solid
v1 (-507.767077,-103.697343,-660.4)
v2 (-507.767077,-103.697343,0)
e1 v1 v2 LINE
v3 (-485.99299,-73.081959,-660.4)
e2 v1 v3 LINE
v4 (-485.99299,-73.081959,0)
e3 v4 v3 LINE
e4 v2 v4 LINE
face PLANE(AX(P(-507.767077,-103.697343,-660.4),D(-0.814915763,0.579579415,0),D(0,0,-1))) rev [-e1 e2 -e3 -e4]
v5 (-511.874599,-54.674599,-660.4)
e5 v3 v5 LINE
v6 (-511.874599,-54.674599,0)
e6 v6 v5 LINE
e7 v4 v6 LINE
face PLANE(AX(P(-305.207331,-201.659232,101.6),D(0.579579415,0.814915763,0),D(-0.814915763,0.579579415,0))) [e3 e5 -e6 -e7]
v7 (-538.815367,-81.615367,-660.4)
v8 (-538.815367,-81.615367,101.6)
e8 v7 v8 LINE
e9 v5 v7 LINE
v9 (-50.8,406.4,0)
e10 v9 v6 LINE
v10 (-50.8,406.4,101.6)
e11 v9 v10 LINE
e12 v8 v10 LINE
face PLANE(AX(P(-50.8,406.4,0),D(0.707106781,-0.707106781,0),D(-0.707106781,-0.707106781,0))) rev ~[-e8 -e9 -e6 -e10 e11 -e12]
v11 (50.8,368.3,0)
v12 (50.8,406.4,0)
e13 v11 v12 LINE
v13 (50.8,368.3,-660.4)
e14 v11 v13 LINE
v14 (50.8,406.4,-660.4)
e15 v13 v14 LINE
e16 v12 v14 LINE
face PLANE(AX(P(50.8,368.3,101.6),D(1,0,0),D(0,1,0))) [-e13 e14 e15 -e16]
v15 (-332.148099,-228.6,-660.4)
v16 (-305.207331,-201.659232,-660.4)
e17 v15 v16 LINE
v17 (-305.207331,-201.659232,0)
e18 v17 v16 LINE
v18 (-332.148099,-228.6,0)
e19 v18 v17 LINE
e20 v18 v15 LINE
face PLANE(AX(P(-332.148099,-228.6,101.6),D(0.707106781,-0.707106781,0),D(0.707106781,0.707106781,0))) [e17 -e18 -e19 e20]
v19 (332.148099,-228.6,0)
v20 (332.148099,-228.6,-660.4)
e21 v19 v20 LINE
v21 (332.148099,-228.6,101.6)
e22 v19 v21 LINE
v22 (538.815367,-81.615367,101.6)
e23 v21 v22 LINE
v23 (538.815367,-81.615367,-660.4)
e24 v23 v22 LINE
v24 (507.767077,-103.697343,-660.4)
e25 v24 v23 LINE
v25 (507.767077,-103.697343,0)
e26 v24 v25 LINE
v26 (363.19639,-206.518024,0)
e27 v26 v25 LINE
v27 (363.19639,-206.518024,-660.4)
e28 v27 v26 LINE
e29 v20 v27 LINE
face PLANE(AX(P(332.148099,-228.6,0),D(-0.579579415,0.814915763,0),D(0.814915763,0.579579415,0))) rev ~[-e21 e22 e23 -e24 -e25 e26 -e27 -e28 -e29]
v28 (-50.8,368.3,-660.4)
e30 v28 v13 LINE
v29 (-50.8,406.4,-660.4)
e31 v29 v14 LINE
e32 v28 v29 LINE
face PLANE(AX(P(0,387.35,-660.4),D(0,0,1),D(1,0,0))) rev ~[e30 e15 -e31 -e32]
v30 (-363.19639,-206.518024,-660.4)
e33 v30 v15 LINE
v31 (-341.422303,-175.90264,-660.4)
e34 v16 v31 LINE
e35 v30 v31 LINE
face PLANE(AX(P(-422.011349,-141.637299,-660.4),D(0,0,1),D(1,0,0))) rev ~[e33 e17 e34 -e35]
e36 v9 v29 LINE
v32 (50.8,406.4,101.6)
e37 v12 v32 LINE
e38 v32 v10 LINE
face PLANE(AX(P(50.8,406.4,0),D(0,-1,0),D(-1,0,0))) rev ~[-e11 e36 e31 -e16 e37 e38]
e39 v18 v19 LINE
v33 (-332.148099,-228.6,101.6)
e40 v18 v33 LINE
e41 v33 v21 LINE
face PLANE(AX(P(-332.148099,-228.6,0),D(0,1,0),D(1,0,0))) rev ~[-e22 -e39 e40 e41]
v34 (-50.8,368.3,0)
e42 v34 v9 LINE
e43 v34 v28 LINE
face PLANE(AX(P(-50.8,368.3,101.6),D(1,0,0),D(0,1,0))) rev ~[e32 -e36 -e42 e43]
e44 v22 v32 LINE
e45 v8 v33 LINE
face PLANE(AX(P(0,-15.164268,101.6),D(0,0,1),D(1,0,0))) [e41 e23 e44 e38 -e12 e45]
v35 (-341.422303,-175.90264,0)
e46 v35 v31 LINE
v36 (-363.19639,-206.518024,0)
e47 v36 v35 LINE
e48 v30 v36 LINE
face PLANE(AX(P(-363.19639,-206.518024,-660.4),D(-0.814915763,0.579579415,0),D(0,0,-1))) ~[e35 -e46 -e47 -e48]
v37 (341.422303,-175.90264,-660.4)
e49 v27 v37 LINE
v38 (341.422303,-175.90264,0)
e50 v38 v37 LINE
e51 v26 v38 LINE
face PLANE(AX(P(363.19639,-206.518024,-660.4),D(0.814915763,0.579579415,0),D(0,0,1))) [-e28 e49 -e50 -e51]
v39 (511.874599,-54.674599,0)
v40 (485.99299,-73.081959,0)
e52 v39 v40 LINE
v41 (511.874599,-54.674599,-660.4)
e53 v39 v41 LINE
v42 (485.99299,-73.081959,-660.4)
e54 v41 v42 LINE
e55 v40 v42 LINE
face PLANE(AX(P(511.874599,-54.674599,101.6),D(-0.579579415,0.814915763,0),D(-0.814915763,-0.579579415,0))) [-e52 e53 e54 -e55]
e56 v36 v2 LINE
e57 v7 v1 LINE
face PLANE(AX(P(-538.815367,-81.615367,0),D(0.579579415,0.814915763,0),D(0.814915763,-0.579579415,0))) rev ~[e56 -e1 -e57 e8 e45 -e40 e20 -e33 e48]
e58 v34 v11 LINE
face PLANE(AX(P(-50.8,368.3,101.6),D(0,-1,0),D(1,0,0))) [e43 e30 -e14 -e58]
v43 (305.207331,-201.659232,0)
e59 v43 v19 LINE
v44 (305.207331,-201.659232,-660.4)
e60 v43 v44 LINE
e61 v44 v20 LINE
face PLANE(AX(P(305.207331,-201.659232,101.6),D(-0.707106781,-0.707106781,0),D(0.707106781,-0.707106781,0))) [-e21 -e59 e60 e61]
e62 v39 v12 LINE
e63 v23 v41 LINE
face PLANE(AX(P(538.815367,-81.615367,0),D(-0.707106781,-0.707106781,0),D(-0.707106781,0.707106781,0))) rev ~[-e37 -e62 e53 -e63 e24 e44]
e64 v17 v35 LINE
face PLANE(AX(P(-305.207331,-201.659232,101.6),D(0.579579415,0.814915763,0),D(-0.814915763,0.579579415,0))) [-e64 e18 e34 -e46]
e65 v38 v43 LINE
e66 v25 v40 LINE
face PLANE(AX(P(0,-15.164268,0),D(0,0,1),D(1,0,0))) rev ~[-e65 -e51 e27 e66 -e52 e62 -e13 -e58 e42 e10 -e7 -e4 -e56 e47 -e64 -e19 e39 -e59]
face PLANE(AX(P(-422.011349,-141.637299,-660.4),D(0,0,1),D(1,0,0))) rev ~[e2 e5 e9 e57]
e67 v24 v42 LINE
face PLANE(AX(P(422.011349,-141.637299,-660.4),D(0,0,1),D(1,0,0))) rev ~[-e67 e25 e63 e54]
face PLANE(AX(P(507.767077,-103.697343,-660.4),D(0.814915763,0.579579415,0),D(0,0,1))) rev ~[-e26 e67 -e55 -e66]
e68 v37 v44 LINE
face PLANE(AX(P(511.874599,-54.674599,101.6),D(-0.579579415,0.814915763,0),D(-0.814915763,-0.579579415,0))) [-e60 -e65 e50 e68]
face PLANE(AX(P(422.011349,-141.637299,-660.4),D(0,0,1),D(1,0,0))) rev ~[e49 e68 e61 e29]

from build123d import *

# Parameters (mm, degrees)
F1_DEPTH = 101.6
F2_W     = 101.6
F2_H     = 38.1
F3_DEPTH = 762
F4_W     = 177.4056817709
F4_H     = 660.4
F5_DEPTH = 76.2


# Not quite as in the source:
# - a pattern or mirror of a feature is missing from the dataset's text; its kind, count and spacing are read off the source's solid


with BuildPart() as f1:
    # F0 (on Top) → F1 (new body)
    with BuildSketch(Plane.XY):
        Polygon((332.1480994978, 125.0519005022), (228.6, 228.6), (0, 228.6), (-228.6, 228.6), (-332.1480994978, 125.0519005022), (-332.1480994978, -228.6), (-228.6, -228.6), (228.6, -228.6), (332.1480994978, -228.6), align=None)
        Polygon((-228.6, 228.6), (0, 228.6), (0, 406.4), (-50.8, 406.4), align=None)
        Polygon((0, 228.6), (228.6, 228.6), (50.8, 406.4), (0, 406.4), align=None)
        Polygon((538.8153672641, -81.6153672641), (332.1480994978, 125.0519005022), (332.1480994978, -228.6), align=None)
        Polygon((-332.1480994978, -228.6), (-332.1480994978, 125.0519005022), (-538.8153672641, -81.6153672641), align=None)
    extrude(amount=F1_DEPTH)

    # F2 (on face) → F3 (join)
    with BuildSketch(Plane.XY.offset(101.6)):
        Polygon((-511.8745989009, -54.6745989009), (-538.8153672641, -81.6153672641), (-332.1480994978, -228.6), (-305.2073311346, -201.6592316368), align=None)
        Polygon((305.2073311346, -201.6592316368), (332.1480994978, -228.6), (538.8153672641, -81.6153672641), (511.8745989009, -54.6745989009), align=None)
        with Locations((0, 387.35)):
            Rectangle(F2_W, F2_H)
    extrude(amount=-F3_DEPTH)

    # F4 (on face) → F5 (cut)
    with BuildSketch(Plane(origin=(219.5423321657, -308.6867865247, 0), x_dir=(0.8149157634, 0.5795794152, 0), z_dir=(0.5795794152, -0.8149157634, 0))):
        with Locations((264.983708636, -330.2)):
            Rectangle(F4_W, F4_H)
    f5 = extrude(amount=-F5_DEPTH, mode=Mode.SUBTRACT)

    # F5_copies: F5 across plane
    add(f5.mirror(Plane(origin=(0, 0, 0), x_dir=(0, 0, -1), z_dir=(-1, 0, 0))), mode=Mode.SUBTRACT)


solid = f1.part
